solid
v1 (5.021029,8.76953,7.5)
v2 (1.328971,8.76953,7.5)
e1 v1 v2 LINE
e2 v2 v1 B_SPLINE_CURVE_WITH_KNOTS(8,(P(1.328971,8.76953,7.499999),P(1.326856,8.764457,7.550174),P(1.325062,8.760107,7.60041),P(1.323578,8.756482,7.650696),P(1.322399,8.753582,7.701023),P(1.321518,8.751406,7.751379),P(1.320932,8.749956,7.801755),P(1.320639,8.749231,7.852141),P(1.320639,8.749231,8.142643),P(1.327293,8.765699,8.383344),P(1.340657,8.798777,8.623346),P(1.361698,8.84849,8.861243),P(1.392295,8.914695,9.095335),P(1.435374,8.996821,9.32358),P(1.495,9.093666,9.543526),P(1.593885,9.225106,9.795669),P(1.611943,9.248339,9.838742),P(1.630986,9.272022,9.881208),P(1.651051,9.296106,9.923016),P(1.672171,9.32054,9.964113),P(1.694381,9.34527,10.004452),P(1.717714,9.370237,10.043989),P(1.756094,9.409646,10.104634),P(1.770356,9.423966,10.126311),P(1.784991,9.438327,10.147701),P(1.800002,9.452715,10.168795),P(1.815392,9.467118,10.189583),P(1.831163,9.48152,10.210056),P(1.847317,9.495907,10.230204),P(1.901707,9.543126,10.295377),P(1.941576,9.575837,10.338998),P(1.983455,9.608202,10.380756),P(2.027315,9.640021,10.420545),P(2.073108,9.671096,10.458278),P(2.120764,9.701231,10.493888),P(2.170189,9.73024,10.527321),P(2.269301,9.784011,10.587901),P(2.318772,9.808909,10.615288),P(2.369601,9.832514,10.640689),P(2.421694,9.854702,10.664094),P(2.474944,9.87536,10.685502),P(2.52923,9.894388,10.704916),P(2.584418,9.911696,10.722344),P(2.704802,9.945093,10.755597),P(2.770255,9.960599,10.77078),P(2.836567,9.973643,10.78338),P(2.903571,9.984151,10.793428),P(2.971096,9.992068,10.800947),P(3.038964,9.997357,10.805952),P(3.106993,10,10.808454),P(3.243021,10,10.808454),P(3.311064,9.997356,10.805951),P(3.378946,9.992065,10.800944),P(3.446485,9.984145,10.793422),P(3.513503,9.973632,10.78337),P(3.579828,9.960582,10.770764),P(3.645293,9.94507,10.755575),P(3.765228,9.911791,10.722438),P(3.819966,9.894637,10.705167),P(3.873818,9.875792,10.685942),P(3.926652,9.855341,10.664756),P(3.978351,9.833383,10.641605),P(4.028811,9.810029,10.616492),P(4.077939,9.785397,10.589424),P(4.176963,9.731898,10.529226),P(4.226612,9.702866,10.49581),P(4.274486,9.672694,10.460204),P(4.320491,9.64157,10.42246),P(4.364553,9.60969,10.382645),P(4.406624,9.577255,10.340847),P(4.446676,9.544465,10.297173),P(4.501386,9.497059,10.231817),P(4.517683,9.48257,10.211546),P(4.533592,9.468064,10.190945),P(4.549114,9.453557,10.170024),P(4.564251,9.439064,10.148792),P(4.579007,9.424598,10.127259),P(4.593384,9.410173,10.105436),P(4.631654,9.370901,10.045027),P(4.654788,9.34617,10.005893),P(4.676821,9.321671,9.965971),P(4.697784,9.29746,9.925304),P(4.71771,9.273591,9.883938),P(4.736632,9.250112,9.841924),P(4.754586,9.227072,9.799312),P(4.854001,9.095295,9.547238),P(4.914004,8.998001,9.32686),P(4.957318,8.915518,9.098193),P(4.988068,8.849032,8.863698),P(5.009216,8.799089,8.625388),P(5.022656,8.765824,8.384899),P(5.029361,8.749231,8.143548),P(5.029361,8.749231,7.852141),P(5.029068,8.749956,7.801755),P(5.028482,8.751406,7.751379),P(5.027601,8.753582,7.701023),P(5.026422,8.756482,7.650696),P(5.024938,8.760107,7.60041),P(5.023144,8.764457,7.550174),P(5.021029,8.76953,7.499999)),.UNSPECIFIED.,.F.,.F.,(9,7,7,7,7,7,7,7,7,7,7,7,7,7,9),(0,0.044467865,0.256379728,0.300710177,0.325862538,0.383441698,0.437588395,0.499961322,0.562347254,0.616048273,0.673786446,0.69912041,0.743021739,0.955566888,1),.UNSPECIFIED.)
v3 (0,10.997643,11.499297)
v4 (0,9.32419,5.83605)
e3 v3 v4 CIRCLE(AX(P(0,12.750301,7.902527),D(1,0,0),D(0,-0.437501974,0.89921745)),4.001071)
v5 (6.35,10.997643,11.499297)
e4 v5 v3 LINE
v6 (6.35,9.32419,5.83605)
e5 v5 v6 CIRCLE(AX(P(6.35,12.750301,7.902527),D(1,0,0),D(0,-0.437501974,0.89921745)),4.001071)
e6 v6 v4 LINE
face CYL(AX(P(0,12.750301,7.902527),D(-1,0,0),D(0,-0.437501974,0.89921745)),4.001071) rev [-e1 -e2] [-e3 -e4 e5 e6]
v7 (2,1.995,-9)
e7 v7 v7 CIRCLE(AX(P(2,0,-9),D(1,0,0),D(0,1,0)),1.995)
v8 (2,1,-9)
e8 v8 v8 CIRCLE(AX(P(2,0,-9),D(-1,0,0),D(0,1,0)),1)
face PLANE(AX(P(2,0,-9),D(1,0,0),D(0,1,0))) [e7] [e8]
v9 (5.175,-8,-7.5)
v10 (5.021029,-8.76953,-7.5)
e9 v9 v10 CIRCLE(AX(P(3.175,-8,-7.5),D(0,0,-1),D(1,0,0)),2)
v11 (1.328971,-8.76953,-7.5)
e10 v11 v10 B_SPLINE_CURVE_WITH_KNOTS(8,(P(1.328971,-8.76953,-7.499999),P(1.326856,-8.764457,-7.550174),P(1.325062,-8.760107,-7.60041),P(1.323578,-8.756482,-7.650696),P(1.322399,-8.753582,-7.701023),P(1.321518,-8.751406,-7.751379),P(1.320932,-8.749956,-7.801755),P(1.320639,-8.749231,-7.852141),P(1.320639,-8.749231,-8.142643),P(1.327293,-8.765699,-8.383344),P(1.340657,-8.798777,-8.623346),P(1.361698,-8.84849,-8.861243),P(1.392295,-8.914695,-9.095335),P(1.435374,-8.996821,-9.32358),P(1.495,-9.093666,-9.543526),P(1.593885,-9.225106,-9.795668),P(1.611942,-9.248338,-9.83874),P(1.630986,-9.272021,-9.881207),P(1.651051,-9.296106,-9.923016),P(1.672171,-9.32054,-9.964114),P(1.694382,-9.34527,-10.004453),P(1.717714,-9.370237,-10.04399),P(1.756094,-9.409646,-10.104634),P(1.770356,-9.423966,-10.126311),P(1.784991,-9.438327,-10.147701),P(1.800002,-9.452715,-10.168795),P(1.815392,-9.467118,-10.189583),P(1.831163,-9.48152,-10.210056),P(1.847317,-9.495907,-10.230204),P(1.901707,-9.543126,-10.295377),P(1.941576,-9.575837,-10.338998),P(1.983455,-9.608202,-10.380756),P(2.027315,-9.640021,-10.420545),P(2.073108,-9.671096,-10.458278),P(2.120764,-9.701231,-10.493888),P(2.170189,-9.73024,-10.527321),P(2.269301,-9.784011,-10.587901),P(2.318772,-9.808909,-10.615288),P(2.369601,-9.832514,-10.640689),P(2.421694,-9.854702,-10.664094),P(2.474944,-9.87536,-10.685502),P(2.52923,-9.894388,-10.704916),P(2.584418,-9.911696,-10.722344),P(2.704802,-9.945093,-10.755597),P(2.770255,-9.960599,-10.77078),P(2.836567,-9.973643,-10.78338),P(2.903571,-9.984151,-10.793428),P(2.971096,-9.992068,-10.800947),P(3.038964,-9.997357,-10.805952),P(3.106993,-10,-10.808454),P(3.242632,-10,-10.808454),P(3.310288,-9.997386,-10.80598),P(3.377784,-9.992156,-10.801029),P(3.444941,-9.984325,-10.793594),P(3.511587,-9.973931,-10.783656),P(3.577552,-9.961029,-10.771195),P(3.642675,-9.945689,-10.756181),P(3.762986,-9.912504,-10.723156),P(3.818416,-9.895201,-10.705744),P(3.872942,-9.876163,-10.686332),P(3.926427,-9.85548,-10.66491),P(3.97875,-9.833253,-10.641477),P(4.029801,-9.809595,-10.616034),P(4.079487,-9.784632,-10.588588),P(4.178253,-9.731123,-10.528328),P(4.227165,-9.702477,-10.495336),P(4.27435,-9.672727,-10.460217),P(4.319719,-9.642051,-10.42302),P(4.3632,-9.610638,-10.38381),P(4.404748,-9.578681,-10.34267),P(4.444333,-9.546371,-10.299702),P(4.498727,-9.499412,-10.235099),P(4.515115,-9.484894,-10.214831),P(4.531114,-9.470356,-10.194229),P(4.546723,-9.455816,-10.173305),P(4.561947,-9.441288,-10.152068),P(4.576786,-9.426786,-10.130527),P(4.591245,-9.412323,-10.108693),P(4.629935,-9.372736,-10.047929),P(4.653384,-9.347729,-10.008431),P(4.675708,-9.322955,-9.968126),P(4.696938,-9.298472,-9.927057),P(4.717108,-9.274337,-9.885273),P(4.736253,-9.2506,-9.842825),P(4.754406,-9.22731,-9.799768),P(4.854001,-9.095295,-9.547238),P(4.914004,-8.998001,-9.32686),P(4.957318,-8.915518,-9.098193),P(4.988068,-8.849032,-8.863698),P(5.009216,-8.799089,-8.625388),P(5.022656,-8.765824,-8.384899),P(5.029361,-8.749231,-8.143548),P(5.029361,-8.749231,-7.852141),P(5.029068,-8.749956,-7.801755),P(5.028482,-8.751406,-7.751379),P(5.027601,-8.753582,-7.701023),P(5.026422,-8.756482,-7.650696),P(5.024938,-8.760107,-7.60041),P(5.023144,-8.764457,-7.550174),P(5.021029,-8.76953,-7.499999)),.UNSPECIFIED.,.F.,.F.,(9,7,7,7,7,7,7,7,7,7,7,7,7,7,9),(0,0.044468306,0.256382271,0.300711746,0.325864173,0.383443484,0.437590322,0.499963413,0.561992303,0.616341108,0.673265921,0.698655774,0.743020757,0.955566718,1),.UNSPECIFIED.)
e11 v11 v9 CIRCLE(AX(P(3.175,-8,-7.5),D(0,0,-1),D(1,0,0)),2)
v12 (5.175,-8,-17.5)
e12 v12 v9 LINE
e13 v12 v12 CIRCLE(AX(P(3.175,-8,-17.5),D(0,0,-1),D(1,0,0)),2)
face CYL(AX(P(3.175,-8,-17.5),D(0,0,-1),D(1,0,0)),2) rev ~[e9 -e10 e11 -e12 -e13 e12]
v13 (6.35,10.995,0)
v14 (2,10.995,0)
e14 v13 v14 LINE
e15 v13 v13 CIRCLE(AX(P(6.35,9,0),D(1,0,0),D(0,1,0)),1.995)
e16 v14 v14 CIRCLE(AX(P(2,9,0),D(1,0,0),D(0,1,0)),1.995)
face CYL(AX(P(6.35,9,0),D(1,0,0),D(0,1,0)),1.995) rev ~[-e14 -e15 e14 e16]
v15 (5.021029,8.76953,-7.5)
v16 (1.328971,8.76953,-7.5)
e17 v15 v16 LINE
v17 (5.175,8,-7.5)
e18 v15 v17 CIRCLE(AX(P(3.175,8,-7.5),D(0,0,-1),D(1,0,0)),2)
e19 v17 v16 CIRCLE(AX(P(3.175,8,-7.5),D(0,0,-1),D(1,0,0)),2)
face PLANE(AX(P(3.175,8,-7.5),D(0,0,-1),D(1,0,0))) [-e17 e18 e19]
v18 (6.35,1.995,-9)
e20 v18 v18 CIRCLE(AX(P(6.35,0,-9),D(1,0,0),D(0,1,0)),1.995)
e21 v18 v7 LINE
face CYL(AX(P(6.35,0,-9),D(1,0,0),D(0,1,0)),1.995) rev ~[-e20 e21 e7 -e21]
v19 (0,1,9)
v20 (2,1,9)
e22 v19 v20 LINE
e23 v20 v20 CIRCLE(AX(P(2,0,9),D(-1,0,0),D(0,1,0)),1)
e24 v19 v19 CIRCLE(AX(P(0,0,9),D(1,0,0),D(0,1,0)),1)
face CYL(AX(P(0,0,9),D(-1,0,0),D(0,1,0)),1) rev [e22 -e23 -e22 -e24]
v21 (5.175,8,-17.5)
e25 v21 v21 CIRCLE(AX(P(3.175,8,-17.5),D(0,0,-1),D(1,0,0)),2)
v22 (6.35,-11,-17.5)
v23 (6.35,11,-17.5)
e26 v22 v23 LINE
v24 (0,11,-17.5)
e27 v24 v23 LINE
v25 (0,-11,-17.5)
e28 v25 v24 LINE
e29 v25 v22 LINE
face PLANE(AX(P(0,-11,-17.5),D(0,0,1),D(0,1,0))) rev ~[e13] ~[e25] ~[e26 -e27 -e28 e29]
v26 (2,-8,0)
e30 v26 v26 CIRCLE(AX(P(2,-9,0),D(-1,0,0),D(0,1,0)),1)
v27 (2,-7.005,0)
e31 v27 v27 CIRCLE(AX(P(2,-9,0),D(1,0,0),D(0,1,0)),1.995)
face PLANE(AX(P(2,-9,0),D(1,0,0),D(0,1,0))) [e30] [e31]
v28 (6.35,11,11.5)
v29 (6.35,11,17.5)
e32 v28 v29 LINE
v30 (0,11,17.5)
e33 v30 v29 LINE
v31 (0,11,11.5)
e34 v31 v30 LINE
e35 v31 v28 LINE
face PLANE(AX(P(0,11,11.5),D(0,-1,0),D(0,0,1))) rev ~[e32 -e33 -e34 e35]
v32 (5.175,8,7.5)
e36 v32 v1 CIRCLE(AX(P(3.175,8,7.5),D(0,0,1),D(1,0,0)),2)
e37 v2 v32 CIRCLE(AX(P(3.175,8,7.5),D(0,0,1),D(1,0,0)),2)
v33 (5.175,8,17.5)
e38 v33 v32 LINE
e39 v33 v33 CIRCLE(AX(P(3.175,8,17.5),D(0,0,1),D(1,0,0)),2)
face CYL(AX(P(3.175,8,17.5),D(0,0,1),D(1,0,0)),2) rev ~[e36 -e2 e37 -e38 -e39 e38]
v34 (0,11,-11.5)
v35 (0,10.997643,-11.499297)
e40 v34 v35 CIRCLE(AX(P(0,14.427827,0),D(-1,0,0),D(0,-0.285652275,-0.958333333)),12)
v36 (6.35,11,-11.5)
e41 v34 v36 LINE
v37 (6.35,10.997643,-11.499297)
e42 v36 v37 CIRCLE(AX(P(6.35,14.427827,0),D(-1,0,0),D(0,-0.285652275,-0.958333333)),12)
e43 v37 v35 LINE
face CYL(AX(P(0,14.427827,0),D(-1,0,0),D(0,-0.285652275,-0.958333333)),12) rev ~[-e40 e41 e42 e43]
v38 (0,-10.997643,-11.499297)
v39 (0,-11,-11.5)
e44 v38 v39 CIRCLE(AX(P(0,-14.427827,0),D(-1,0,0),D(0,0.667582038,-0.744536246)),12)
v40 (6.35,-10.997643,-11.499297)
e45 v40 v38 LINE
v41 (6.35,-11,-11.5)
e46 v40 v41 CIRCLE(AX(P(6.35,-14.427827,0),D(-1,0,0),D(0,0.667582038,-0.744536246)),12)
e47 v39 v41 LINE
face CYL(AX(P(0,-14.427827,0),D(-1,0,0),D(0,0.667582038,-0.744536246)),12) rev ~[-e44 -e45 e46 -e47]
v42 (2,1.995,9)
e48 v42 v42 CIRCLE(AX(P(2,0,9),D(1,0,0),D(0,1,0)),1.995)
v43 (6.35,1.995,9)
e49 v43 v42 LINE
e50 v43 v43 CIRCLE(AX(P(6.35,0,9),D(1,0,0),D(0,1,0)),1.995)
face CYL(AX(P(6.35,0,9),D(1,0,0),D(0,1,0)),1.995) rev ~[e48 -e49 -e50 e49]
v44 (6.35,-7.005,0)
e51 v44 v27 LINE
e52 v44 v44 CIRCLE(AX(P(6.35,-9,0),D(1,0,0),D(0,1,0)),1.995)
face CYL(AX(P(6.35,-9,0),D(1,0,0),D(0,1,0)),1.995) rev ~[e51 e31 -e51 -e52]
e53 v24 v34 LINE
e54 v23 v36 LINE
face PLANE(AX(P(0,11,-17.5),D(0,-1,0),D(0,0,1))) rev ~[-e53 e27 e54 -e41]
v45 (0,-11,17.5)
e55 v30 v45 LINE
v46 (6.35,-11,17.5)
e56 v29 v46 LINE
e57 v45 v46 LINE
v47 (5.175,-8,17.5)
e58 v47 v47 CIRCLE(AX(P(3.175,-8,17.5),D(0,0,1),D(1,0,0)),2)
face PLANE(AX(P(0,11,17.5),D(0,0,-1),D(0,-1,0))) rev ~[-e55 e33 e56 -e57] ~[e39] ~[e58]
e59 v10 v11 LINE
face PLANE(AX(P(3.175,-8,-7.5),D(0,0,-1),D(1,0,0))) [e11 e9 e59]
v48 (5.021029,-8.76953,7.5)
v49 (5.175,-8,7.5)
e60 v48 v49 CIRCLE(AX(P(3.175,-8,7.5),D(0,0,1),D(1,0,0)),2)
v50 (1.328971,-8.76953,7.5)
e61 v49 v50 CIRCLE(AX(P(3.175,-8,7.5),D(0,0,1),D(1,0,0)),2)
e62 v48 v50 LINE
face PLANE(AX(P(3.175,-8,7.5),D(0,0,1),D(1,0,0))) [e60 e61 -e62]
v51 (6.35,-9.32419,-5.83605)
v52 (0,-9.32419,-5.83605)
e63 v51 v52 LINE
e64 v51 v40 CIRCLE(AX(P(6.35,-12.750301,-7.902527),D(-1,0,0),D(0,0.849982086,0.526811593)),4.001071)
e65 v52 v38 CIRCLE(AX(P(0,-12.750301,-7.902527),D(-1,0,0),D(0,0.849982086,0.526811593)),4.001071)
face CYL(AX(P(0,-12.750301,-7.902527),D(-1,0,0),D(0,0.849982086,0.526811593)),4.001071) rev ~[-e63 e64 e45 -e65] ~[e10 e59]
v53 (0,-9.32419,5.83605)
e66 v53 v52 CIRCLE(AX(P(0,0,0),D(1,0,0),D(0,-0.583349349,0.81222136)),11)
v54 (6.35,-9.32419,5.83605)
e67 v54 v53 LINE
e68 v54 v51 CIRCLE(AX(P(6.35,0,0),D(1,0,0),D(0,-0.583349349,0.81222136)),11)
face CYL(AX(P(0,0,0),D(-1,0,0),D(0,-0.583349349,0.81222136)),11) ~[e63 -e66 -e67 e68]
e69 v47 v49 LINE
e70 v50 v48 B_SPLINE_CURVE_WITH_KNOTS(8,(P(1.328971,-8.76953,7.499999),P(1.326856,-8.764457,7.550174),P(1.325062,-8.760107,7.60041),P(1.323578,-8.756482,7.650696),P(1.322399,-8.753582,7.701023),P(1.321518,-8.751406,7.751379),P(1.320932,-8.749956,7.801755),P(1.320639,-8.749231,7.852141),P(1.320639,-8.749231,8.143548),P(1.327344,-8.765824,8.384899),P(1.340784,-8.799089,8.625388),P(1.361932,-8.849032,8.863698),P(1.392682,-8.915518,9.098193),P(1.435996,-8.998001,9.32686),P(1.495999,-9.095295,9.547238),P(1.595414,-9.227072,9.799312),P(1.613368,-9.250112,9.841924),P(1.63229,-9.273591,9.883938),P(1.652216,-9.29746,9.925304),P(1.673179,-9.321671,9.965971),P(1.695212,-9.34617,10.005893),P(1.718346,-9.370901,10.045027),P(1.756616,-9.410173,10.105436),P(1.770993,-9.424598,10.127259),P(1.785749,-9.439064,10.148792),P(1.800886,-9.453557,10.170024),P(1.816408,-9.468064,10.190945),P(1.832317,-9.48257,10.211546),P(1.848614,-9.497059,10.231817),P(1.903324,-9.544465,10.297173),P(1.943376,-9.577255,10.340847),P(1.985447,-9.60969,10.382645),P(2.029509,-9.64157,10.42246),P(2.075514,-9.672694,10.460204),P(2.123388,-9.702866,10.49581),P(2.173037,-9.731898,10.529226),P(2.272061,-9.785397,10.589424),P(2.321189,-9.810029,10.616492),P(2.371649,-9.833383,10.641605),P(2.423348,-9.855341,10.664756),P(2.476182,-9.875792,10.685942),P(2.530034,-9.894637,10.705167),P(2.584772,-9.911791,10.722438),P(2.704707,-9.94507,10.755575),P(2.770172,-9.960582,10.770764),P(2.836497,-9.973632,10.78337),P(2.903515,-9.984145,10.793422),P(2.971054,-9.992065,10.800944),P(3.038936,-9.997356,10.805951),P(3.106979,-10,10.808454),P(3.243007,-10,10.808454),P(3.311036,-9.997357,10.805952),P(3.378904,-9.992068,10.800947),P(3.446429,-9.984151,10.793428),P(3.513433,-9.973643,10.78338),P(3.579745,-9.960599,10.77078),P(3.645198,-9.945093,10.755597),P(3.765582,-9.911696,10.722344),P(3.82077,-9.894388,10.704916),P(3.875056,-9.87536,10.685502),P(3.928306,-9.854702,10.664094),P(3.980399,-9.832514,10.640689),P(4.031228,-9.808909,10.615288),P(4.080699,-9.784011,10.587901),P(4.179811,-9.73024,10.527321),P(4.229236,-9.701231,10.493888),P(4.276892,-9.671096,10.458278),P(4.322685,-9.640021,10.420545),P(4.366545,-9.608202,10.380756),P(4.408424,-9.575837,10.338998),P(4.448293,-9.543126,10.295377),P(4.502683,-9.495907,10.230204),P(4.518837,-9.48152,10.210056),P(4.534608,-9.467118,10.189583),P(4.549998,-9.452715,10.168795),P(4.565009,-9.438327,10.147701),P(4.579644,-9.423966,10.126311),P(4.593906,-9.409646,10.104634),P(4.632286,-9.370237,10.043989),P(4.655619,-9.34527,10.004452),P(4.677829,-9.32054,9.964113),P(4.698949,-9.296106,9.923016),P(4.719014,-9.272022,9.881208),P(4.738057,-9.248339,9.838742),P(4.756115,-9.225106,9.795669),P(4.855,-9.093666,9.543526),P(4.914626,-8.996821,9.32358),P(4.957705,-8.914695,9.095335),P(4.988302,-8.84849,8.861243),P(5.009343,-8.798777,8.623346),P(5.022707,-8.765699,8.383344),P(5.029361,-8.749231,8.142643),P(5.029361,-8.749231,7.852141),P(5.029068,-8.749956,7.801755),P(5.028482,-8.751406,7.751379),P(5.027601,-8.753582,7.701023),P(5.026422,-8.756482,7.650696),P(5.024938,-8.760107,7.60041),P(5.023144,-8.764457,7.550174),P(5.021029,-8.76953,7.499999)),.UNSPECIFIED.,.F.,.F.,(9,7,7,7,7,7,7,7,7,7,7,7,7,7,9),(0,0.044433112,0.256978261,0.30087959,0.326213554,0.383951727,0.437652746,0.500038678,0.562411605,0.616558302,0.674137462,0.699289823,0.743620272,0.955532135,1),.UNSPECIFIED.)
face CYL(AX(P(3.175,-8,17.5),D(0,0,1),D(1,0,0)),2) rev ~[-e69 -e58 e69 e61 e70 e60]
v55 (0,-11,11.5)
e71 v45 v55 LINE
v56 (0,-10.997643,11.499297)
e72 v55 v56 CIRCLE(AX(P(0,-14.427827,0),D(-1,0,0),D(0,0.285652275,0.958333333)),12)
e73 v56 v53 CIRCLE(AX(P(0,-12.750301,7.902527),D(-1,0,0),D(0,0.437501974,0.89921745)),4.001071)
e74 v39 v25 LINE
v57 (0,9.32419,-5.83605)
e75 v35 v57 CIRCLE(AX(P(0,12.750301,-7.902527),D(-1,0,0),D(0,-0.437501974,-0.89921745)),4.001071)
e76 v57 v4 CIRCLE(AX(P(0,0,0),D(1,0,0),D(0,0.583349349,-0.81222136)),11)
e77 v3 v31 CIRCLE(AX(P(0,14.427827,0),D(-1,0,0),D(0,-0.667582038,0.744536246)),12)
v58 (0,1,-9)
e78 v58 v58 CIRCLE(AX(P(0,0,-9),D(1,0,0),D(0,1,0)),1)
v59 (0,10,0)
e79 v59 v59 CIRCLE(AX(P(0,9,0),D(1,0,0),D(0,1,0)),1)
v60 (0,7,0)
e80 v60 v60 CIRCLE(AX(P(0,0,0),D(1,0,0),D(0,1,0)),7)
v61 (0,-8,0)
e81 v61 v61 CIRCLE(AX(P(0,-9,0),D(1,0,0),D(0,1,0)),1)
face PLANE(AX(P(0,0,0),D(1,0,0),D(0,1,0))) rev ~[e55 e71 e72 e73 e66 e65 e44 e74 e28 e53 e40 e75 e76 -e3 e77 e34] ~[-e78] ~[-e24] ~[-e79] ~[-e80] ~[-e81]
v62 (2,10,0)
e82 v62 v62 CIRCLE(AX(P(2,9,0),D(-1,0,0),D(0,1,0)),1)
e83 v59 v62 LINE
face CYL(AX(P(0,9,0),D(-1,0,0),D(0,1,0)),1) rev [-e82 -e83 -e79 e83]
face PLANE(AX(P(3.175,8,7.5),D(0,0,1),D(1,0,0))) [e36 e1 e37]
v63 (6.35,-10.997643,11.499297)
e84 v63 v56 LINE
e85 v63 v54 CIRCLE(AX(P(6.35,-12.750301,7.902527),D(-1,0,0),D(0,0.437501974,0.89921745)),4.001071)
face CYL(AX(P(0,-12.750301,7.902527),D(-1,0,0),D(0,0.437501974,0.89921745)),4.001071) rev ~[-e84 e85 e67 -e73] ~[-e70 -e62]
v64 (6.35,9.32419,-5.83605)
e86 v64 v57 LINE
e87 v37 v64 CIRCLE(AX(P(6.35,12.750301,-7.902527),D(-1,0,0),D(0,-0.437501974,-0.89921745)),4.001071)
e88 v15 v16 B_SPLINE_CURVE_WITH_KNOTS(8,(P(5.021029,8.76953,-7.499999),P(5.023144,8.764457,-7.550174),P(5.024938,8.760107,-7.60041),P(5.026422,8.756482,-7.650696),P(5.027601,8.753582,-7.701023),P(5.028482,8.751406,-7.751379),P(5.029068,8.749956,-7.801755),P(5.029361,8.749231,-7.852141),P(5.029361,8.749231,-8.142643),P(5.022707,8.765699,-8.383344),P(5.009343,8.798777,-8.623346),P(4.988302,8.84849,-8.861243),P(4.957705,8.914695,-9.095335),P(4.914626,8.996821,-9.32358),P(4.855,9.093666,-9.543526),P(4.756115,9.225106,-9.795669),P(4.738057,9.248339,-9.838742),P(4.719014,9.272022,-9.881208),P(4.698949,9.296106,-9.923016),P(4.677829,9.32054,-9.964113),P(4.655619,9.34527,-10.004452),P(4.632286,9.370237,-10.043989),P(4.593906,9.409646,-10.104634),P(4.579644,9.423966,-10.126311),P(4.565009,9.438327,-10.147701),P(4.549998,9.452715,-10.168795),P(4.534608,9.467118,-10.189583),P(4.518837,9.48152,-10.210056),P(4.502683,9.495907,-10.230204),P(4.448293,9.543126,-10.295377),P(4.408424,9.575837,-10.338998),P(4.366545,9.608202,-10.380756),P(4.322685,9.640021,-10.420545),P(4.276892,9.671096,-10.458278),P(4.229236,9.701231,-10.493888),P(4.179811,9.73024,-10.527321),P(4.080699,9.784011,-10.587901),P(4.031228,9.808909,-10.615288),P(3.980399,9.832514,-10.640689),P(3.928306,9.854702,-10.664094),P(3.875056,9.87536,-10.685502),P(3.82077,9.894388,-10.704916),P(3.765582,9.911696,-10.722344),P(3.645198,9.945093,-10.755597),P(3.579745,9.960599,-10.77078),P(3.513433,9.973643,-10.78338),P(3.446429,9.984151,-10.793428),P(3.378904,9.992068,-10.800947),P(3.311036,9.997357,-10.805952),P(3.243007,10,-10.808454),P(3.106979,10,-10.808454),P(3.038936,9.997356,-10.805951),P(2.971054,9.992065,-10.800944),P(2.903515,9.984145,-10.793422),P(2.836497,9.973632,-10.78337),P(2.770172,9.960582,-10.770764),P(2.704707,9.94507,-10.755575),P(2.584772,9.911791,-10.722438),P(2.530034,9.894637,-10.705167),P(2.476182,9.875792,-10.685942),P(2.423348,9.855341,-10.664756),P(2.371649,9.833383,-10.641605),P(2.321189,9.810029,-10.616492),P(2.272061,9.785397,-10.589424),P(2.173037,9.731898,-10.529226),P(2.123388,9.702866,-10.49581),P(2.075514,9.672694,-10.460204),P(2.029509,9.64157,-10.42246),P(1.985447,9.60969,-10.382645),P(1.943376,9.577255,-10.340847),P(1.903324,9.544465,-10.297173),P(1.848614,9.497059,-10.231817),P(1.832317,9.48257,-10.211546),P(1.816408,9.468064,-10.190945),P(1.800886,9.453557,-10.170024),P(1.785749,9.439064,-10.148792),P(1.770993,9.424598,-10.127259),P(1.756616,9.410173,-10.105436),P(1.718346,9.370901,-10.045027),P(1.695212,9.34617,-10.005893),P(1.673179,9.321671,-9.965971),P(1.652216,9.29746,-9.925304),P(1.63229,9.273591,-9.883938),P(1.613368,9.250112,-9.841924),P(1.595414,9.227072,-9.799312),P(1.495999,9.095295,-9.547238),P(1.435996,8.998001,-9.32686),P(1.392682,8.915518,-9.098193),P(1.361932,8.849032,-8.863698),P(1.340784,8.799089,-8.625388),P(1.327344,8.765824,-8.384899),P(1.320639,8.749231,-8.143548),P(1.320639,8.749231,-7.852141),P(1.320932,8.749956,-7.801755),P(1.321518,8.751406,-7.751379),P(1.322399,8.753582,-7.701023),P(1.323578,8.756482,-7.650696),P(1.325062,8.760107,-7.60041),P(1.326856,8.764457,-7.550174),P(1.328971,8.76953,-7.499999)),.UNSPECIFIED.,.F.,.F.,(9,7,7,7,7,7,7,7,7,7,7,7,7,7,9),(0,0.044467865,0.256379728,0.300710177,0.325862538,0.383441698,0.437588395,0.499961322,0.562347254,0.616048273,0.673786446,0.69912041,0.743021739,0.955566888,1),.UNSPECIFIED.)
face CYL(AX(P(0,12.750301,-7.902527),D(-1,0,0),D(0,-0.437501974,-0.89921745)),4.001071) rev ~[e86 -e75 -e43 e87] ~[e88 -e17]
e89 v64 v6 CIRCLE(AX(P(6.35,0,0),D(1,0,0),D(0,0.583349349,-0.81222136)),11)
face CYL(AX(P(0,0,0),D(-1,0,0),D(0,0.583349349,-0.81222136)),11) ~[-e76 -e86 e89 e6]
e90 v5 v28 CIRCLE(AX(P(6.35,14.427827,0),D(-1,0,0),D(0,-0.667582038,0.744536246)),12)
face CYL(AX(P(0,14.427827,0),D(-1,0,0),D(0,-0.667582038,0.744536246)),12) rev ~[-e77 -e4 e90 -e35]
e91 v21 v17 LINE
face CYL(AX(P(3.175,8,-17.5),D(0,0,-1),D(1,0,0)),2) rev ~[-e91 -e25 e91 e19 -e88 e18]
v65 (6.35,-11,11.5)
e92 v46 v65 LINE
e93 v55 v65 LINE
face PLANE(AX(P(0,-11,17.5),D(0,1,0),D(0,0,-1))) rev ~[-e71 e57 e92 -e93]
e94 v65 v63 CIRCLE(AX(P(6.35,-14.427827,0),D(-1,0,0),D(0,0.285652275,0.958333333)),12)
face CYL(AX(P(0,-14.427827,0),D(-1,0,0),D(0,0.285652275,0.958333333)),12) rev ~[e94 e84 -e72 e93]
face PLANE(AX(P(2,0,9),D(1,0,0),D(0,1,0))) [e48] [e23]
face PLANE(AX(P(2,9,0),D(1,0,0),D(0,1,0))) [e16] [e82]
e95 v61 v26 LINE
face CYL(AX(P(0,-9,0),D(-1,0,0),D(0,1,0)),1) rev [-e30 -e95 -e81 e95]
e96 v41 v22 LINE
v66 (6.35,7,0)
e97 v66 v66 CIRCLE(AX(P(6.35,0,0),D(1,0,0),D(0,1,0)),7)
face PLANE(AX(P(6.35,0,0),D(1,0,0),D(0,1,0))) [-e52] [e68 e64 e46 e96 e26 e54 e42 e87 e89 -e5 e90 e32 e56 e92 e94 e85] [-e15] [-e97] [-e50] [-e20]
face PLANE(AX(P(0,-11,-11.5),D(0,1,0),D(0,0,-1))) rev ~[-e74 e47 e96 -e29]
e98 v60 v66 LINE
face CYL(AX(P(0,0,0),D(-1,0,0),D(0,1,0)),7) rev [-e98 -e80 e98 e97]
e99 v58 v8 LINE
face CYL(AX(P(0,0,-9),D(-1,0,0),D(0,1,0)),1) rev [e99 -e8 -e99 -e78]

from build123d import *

# Parameters (mm, degrees)
F0_R        = 1
F0_R_2      = 7
F1_DEPTH    = 6.35
F2_T1_DEPTH = 6.35
F3_R        = 1.995
F4_DEPTH    = 4.35
F5_R        = 2
F6_DEPTH    = 10
F7_R        = 2
F8_DEPTH    = 10


# Not quite as in the source:
# - a fillet or chamfer that OpenCascade refuses, or shapes differently, is made with other operations: its cross-section is extruded or revolved along the edge and cut away or added


with BuildPart() as f1:
    # F0 (on Right) → F1 (new body)
    with BuildSketch(Plane.YZ):
        with BuildLine():
            ThreePointArc((-11, 11.5), (-8.5663313628, 10.4710489148), (-6.4168428396, 8.9344349554))
            ThreePointArc((-6.4168428396, 8.9344349554), (-11, 0), (-6.4168428396, -8.9344349554))
            ThreePointArc((-6.4168428396, -8.9344349554), (-8.5663313628, -10.4710489148), (-11, -11.5))
            Line((-11, -11.5), (-11, -17.5))
            Line((-11, -17.5), (11, -17.5))
            Line((11, -17.5), (11, -11.5))
            ThreePointArc((11, -11.5), (8.5663313628, -10.4710489148), (6.4168428396, -8.9344349554))
            ThreePointArc((6.4168428396, -8.9344349554), (11, 0), (6.4168428396, 8.9344349554))
            ThreePointArc((6.4168428396, 8.9344349554), (8.5663313628, 10.4710489148), (11, 11.5))
            Line((11, 11.5), (11, 17.5))
            Line((11, 17.5), (-11, 17.5))
            Line((-11, 17.5), (-11, 11.5))
        make_face()
        with Locations((0, -9)):
            Circle(F0_R, mode=Mode.SUBTRACT)
        with Locations((-9, 0)):
            Circle(F0_R, mode=Mode.SUBTRACT)
        Circle(F0_R_2, mode=Mode.SUBTRACT)
        with Locations((9, 0)):
            Circle(F0_R, mode=Mode.SUBTRACT)
        with Locations((0, 9)):
            Circle(F0_R, mode=Mode.SUBTRACT)
    extrude(amount=F1_DEPTH)

    # F2: fillet of radius 4 on 4 edges, made by hand

    # F2_s2 → F2_t1 (join)
    with BuildSketch(Plane.YZ):
        with BuildLine():
            ThreePointArc((-10.9998249992, 11.500359687), (-8.9067871665, 9.0142668997), (-9.3494629478, 5.7947167962))
            Line((-9.3494629478, 5.7947167962), (-9.0093791138, 5.5839357582))
            ThreePointArc((-9.0093791138, 5.5839357582), (-7.7456923262, 7.2361578693), (-6.1834406461, 8.6094594545))
            Line((-6.1834406461, 8.6094594545), (-6.1497385524, 9.2323291646))
            ThreePointArc((-6.1497385524, 9.2323291646), (-8.3709064916, 10.8201832442), (-10.8247773704, 11.8601429381))
            Line((-10.8247773704, 11.8601429381), (-10.9998249992, 11.500359687))
        make_face()
        with BuildLine():
            ThreePointArc((-9.3494629478, -5.7947167962), (-8.9067871665, -9.0142668997), (-10.9998249992, -11.500359687))
            Line((-10.9998249992, -11.500359687), (-10.8247773704, -11.8601429381))
            ThreePointArc((-10.8247773704, -11.8601429381), (-8.3709064916, -10.8201832442), (-6.1497385524, -9.2323291646))
            Line((-6.1497385524, -9.2323291646), (-6.1834406461, -8.6094594545))
            ThreePointArc((-6.1834406461, -8.6094594545), (-7.7456923262, -7.2361578693), (-9.0093791138, -5.5839357582))
            Line((-9.0093791138, -5.5839357582), (-9.3494629478, -5.7947167962))
        make_face()
        with BuildLine():
            ThreePointArc((10.9998249992, -11.500359687), (8.9067871665, -9.0142668997), (9.3494629478, -5.7947167962))
            Line((9.3494629478, -5.7947167962), (9.0093791138, -5.5839357582))
            ThreePointArc((9.0093791138, -5.5839357582), (7.7456923262, -7.2361578693), (6.1834406461, -8.6094594545))
            Line((6.1834406461, -8.6094594545), (6.1497385524, -9.2323291646))
            ThreePointArc((6.1497385524, -9.2323291646), (8.3709064916, -10.8201832442), (10.8247773704, -11.8601429381))
            Line((10.8247773704, -11.8601429381), (10.9998249992, -11.500359687))
        make_face()
        with BuildLine():
            ThreePointArc((10.9998249992, 11.500359687), (8.9067871665, 9.0142668997), (9.3494629478, 5.7947167962))
            Line((9.3494629478, 5.7947167962), (9.0093791138, 5.5839357582))
            ThreePointArc((9.0093791138, 5.5839357582), (7.7456923262, 7.2361578693), (6.1834406461, 8.6094594545))
            Line((6.1834406461, 8.6094594545), (6.1497385524, 9.2323291646))
            ThreePointArc((6.1497385524, 9.2323291646), (8.3709064916, 10.8201832442), (10.8247773704, 11.8601429381))
            Line((10.8247773704, 11.8601429381), (10.9998249992, 11.500359687))
        make_face()
    extrude(amount=F2_T1_DEPTH)

    # F3 (on face) → F4 (cut)
    with BuildSketch(Plane.YZ.offset(6.35)):
        with Locations((0, 9)):
            Circle(F3_R)
        with Locations((9, 0)):
            Circle(F3_R)
        with Locations((0, -9)):
            Circle(F3_R)
        with Locations((-9, 0)):
            Circle(F3_R)
    extrude(amount=-F4_DEPTH, mode=Mode.SUBTRACT)

    # F5 (on face) → F6 (cut)
    with BuildSketch(Plane.XY.offset(17.5)):
        with Locations((3.175, 8)):
            Circle(F5_R)
        with Locations((3.175, -8)):
            Circle(F5_R)
    extrude(amount=-F6_DEPTH, mode=Mode.SUBTRACT)

    # F7 (on face) → F8 (cut)
    with BuildSketch(Plane(origin=(0, 0, -17.5), x_dir=(1, 0, 0), z_dir=(0, 0, -1))):
        with Locations((3.175, 8)):
            Circle(F7_R)
        with Locations((3.175, -8)):
            Circle(F7_R)
    extrude(amount=-F8_DEPTH, mode=Mode.SUBTRACT)


solid = f1.part
